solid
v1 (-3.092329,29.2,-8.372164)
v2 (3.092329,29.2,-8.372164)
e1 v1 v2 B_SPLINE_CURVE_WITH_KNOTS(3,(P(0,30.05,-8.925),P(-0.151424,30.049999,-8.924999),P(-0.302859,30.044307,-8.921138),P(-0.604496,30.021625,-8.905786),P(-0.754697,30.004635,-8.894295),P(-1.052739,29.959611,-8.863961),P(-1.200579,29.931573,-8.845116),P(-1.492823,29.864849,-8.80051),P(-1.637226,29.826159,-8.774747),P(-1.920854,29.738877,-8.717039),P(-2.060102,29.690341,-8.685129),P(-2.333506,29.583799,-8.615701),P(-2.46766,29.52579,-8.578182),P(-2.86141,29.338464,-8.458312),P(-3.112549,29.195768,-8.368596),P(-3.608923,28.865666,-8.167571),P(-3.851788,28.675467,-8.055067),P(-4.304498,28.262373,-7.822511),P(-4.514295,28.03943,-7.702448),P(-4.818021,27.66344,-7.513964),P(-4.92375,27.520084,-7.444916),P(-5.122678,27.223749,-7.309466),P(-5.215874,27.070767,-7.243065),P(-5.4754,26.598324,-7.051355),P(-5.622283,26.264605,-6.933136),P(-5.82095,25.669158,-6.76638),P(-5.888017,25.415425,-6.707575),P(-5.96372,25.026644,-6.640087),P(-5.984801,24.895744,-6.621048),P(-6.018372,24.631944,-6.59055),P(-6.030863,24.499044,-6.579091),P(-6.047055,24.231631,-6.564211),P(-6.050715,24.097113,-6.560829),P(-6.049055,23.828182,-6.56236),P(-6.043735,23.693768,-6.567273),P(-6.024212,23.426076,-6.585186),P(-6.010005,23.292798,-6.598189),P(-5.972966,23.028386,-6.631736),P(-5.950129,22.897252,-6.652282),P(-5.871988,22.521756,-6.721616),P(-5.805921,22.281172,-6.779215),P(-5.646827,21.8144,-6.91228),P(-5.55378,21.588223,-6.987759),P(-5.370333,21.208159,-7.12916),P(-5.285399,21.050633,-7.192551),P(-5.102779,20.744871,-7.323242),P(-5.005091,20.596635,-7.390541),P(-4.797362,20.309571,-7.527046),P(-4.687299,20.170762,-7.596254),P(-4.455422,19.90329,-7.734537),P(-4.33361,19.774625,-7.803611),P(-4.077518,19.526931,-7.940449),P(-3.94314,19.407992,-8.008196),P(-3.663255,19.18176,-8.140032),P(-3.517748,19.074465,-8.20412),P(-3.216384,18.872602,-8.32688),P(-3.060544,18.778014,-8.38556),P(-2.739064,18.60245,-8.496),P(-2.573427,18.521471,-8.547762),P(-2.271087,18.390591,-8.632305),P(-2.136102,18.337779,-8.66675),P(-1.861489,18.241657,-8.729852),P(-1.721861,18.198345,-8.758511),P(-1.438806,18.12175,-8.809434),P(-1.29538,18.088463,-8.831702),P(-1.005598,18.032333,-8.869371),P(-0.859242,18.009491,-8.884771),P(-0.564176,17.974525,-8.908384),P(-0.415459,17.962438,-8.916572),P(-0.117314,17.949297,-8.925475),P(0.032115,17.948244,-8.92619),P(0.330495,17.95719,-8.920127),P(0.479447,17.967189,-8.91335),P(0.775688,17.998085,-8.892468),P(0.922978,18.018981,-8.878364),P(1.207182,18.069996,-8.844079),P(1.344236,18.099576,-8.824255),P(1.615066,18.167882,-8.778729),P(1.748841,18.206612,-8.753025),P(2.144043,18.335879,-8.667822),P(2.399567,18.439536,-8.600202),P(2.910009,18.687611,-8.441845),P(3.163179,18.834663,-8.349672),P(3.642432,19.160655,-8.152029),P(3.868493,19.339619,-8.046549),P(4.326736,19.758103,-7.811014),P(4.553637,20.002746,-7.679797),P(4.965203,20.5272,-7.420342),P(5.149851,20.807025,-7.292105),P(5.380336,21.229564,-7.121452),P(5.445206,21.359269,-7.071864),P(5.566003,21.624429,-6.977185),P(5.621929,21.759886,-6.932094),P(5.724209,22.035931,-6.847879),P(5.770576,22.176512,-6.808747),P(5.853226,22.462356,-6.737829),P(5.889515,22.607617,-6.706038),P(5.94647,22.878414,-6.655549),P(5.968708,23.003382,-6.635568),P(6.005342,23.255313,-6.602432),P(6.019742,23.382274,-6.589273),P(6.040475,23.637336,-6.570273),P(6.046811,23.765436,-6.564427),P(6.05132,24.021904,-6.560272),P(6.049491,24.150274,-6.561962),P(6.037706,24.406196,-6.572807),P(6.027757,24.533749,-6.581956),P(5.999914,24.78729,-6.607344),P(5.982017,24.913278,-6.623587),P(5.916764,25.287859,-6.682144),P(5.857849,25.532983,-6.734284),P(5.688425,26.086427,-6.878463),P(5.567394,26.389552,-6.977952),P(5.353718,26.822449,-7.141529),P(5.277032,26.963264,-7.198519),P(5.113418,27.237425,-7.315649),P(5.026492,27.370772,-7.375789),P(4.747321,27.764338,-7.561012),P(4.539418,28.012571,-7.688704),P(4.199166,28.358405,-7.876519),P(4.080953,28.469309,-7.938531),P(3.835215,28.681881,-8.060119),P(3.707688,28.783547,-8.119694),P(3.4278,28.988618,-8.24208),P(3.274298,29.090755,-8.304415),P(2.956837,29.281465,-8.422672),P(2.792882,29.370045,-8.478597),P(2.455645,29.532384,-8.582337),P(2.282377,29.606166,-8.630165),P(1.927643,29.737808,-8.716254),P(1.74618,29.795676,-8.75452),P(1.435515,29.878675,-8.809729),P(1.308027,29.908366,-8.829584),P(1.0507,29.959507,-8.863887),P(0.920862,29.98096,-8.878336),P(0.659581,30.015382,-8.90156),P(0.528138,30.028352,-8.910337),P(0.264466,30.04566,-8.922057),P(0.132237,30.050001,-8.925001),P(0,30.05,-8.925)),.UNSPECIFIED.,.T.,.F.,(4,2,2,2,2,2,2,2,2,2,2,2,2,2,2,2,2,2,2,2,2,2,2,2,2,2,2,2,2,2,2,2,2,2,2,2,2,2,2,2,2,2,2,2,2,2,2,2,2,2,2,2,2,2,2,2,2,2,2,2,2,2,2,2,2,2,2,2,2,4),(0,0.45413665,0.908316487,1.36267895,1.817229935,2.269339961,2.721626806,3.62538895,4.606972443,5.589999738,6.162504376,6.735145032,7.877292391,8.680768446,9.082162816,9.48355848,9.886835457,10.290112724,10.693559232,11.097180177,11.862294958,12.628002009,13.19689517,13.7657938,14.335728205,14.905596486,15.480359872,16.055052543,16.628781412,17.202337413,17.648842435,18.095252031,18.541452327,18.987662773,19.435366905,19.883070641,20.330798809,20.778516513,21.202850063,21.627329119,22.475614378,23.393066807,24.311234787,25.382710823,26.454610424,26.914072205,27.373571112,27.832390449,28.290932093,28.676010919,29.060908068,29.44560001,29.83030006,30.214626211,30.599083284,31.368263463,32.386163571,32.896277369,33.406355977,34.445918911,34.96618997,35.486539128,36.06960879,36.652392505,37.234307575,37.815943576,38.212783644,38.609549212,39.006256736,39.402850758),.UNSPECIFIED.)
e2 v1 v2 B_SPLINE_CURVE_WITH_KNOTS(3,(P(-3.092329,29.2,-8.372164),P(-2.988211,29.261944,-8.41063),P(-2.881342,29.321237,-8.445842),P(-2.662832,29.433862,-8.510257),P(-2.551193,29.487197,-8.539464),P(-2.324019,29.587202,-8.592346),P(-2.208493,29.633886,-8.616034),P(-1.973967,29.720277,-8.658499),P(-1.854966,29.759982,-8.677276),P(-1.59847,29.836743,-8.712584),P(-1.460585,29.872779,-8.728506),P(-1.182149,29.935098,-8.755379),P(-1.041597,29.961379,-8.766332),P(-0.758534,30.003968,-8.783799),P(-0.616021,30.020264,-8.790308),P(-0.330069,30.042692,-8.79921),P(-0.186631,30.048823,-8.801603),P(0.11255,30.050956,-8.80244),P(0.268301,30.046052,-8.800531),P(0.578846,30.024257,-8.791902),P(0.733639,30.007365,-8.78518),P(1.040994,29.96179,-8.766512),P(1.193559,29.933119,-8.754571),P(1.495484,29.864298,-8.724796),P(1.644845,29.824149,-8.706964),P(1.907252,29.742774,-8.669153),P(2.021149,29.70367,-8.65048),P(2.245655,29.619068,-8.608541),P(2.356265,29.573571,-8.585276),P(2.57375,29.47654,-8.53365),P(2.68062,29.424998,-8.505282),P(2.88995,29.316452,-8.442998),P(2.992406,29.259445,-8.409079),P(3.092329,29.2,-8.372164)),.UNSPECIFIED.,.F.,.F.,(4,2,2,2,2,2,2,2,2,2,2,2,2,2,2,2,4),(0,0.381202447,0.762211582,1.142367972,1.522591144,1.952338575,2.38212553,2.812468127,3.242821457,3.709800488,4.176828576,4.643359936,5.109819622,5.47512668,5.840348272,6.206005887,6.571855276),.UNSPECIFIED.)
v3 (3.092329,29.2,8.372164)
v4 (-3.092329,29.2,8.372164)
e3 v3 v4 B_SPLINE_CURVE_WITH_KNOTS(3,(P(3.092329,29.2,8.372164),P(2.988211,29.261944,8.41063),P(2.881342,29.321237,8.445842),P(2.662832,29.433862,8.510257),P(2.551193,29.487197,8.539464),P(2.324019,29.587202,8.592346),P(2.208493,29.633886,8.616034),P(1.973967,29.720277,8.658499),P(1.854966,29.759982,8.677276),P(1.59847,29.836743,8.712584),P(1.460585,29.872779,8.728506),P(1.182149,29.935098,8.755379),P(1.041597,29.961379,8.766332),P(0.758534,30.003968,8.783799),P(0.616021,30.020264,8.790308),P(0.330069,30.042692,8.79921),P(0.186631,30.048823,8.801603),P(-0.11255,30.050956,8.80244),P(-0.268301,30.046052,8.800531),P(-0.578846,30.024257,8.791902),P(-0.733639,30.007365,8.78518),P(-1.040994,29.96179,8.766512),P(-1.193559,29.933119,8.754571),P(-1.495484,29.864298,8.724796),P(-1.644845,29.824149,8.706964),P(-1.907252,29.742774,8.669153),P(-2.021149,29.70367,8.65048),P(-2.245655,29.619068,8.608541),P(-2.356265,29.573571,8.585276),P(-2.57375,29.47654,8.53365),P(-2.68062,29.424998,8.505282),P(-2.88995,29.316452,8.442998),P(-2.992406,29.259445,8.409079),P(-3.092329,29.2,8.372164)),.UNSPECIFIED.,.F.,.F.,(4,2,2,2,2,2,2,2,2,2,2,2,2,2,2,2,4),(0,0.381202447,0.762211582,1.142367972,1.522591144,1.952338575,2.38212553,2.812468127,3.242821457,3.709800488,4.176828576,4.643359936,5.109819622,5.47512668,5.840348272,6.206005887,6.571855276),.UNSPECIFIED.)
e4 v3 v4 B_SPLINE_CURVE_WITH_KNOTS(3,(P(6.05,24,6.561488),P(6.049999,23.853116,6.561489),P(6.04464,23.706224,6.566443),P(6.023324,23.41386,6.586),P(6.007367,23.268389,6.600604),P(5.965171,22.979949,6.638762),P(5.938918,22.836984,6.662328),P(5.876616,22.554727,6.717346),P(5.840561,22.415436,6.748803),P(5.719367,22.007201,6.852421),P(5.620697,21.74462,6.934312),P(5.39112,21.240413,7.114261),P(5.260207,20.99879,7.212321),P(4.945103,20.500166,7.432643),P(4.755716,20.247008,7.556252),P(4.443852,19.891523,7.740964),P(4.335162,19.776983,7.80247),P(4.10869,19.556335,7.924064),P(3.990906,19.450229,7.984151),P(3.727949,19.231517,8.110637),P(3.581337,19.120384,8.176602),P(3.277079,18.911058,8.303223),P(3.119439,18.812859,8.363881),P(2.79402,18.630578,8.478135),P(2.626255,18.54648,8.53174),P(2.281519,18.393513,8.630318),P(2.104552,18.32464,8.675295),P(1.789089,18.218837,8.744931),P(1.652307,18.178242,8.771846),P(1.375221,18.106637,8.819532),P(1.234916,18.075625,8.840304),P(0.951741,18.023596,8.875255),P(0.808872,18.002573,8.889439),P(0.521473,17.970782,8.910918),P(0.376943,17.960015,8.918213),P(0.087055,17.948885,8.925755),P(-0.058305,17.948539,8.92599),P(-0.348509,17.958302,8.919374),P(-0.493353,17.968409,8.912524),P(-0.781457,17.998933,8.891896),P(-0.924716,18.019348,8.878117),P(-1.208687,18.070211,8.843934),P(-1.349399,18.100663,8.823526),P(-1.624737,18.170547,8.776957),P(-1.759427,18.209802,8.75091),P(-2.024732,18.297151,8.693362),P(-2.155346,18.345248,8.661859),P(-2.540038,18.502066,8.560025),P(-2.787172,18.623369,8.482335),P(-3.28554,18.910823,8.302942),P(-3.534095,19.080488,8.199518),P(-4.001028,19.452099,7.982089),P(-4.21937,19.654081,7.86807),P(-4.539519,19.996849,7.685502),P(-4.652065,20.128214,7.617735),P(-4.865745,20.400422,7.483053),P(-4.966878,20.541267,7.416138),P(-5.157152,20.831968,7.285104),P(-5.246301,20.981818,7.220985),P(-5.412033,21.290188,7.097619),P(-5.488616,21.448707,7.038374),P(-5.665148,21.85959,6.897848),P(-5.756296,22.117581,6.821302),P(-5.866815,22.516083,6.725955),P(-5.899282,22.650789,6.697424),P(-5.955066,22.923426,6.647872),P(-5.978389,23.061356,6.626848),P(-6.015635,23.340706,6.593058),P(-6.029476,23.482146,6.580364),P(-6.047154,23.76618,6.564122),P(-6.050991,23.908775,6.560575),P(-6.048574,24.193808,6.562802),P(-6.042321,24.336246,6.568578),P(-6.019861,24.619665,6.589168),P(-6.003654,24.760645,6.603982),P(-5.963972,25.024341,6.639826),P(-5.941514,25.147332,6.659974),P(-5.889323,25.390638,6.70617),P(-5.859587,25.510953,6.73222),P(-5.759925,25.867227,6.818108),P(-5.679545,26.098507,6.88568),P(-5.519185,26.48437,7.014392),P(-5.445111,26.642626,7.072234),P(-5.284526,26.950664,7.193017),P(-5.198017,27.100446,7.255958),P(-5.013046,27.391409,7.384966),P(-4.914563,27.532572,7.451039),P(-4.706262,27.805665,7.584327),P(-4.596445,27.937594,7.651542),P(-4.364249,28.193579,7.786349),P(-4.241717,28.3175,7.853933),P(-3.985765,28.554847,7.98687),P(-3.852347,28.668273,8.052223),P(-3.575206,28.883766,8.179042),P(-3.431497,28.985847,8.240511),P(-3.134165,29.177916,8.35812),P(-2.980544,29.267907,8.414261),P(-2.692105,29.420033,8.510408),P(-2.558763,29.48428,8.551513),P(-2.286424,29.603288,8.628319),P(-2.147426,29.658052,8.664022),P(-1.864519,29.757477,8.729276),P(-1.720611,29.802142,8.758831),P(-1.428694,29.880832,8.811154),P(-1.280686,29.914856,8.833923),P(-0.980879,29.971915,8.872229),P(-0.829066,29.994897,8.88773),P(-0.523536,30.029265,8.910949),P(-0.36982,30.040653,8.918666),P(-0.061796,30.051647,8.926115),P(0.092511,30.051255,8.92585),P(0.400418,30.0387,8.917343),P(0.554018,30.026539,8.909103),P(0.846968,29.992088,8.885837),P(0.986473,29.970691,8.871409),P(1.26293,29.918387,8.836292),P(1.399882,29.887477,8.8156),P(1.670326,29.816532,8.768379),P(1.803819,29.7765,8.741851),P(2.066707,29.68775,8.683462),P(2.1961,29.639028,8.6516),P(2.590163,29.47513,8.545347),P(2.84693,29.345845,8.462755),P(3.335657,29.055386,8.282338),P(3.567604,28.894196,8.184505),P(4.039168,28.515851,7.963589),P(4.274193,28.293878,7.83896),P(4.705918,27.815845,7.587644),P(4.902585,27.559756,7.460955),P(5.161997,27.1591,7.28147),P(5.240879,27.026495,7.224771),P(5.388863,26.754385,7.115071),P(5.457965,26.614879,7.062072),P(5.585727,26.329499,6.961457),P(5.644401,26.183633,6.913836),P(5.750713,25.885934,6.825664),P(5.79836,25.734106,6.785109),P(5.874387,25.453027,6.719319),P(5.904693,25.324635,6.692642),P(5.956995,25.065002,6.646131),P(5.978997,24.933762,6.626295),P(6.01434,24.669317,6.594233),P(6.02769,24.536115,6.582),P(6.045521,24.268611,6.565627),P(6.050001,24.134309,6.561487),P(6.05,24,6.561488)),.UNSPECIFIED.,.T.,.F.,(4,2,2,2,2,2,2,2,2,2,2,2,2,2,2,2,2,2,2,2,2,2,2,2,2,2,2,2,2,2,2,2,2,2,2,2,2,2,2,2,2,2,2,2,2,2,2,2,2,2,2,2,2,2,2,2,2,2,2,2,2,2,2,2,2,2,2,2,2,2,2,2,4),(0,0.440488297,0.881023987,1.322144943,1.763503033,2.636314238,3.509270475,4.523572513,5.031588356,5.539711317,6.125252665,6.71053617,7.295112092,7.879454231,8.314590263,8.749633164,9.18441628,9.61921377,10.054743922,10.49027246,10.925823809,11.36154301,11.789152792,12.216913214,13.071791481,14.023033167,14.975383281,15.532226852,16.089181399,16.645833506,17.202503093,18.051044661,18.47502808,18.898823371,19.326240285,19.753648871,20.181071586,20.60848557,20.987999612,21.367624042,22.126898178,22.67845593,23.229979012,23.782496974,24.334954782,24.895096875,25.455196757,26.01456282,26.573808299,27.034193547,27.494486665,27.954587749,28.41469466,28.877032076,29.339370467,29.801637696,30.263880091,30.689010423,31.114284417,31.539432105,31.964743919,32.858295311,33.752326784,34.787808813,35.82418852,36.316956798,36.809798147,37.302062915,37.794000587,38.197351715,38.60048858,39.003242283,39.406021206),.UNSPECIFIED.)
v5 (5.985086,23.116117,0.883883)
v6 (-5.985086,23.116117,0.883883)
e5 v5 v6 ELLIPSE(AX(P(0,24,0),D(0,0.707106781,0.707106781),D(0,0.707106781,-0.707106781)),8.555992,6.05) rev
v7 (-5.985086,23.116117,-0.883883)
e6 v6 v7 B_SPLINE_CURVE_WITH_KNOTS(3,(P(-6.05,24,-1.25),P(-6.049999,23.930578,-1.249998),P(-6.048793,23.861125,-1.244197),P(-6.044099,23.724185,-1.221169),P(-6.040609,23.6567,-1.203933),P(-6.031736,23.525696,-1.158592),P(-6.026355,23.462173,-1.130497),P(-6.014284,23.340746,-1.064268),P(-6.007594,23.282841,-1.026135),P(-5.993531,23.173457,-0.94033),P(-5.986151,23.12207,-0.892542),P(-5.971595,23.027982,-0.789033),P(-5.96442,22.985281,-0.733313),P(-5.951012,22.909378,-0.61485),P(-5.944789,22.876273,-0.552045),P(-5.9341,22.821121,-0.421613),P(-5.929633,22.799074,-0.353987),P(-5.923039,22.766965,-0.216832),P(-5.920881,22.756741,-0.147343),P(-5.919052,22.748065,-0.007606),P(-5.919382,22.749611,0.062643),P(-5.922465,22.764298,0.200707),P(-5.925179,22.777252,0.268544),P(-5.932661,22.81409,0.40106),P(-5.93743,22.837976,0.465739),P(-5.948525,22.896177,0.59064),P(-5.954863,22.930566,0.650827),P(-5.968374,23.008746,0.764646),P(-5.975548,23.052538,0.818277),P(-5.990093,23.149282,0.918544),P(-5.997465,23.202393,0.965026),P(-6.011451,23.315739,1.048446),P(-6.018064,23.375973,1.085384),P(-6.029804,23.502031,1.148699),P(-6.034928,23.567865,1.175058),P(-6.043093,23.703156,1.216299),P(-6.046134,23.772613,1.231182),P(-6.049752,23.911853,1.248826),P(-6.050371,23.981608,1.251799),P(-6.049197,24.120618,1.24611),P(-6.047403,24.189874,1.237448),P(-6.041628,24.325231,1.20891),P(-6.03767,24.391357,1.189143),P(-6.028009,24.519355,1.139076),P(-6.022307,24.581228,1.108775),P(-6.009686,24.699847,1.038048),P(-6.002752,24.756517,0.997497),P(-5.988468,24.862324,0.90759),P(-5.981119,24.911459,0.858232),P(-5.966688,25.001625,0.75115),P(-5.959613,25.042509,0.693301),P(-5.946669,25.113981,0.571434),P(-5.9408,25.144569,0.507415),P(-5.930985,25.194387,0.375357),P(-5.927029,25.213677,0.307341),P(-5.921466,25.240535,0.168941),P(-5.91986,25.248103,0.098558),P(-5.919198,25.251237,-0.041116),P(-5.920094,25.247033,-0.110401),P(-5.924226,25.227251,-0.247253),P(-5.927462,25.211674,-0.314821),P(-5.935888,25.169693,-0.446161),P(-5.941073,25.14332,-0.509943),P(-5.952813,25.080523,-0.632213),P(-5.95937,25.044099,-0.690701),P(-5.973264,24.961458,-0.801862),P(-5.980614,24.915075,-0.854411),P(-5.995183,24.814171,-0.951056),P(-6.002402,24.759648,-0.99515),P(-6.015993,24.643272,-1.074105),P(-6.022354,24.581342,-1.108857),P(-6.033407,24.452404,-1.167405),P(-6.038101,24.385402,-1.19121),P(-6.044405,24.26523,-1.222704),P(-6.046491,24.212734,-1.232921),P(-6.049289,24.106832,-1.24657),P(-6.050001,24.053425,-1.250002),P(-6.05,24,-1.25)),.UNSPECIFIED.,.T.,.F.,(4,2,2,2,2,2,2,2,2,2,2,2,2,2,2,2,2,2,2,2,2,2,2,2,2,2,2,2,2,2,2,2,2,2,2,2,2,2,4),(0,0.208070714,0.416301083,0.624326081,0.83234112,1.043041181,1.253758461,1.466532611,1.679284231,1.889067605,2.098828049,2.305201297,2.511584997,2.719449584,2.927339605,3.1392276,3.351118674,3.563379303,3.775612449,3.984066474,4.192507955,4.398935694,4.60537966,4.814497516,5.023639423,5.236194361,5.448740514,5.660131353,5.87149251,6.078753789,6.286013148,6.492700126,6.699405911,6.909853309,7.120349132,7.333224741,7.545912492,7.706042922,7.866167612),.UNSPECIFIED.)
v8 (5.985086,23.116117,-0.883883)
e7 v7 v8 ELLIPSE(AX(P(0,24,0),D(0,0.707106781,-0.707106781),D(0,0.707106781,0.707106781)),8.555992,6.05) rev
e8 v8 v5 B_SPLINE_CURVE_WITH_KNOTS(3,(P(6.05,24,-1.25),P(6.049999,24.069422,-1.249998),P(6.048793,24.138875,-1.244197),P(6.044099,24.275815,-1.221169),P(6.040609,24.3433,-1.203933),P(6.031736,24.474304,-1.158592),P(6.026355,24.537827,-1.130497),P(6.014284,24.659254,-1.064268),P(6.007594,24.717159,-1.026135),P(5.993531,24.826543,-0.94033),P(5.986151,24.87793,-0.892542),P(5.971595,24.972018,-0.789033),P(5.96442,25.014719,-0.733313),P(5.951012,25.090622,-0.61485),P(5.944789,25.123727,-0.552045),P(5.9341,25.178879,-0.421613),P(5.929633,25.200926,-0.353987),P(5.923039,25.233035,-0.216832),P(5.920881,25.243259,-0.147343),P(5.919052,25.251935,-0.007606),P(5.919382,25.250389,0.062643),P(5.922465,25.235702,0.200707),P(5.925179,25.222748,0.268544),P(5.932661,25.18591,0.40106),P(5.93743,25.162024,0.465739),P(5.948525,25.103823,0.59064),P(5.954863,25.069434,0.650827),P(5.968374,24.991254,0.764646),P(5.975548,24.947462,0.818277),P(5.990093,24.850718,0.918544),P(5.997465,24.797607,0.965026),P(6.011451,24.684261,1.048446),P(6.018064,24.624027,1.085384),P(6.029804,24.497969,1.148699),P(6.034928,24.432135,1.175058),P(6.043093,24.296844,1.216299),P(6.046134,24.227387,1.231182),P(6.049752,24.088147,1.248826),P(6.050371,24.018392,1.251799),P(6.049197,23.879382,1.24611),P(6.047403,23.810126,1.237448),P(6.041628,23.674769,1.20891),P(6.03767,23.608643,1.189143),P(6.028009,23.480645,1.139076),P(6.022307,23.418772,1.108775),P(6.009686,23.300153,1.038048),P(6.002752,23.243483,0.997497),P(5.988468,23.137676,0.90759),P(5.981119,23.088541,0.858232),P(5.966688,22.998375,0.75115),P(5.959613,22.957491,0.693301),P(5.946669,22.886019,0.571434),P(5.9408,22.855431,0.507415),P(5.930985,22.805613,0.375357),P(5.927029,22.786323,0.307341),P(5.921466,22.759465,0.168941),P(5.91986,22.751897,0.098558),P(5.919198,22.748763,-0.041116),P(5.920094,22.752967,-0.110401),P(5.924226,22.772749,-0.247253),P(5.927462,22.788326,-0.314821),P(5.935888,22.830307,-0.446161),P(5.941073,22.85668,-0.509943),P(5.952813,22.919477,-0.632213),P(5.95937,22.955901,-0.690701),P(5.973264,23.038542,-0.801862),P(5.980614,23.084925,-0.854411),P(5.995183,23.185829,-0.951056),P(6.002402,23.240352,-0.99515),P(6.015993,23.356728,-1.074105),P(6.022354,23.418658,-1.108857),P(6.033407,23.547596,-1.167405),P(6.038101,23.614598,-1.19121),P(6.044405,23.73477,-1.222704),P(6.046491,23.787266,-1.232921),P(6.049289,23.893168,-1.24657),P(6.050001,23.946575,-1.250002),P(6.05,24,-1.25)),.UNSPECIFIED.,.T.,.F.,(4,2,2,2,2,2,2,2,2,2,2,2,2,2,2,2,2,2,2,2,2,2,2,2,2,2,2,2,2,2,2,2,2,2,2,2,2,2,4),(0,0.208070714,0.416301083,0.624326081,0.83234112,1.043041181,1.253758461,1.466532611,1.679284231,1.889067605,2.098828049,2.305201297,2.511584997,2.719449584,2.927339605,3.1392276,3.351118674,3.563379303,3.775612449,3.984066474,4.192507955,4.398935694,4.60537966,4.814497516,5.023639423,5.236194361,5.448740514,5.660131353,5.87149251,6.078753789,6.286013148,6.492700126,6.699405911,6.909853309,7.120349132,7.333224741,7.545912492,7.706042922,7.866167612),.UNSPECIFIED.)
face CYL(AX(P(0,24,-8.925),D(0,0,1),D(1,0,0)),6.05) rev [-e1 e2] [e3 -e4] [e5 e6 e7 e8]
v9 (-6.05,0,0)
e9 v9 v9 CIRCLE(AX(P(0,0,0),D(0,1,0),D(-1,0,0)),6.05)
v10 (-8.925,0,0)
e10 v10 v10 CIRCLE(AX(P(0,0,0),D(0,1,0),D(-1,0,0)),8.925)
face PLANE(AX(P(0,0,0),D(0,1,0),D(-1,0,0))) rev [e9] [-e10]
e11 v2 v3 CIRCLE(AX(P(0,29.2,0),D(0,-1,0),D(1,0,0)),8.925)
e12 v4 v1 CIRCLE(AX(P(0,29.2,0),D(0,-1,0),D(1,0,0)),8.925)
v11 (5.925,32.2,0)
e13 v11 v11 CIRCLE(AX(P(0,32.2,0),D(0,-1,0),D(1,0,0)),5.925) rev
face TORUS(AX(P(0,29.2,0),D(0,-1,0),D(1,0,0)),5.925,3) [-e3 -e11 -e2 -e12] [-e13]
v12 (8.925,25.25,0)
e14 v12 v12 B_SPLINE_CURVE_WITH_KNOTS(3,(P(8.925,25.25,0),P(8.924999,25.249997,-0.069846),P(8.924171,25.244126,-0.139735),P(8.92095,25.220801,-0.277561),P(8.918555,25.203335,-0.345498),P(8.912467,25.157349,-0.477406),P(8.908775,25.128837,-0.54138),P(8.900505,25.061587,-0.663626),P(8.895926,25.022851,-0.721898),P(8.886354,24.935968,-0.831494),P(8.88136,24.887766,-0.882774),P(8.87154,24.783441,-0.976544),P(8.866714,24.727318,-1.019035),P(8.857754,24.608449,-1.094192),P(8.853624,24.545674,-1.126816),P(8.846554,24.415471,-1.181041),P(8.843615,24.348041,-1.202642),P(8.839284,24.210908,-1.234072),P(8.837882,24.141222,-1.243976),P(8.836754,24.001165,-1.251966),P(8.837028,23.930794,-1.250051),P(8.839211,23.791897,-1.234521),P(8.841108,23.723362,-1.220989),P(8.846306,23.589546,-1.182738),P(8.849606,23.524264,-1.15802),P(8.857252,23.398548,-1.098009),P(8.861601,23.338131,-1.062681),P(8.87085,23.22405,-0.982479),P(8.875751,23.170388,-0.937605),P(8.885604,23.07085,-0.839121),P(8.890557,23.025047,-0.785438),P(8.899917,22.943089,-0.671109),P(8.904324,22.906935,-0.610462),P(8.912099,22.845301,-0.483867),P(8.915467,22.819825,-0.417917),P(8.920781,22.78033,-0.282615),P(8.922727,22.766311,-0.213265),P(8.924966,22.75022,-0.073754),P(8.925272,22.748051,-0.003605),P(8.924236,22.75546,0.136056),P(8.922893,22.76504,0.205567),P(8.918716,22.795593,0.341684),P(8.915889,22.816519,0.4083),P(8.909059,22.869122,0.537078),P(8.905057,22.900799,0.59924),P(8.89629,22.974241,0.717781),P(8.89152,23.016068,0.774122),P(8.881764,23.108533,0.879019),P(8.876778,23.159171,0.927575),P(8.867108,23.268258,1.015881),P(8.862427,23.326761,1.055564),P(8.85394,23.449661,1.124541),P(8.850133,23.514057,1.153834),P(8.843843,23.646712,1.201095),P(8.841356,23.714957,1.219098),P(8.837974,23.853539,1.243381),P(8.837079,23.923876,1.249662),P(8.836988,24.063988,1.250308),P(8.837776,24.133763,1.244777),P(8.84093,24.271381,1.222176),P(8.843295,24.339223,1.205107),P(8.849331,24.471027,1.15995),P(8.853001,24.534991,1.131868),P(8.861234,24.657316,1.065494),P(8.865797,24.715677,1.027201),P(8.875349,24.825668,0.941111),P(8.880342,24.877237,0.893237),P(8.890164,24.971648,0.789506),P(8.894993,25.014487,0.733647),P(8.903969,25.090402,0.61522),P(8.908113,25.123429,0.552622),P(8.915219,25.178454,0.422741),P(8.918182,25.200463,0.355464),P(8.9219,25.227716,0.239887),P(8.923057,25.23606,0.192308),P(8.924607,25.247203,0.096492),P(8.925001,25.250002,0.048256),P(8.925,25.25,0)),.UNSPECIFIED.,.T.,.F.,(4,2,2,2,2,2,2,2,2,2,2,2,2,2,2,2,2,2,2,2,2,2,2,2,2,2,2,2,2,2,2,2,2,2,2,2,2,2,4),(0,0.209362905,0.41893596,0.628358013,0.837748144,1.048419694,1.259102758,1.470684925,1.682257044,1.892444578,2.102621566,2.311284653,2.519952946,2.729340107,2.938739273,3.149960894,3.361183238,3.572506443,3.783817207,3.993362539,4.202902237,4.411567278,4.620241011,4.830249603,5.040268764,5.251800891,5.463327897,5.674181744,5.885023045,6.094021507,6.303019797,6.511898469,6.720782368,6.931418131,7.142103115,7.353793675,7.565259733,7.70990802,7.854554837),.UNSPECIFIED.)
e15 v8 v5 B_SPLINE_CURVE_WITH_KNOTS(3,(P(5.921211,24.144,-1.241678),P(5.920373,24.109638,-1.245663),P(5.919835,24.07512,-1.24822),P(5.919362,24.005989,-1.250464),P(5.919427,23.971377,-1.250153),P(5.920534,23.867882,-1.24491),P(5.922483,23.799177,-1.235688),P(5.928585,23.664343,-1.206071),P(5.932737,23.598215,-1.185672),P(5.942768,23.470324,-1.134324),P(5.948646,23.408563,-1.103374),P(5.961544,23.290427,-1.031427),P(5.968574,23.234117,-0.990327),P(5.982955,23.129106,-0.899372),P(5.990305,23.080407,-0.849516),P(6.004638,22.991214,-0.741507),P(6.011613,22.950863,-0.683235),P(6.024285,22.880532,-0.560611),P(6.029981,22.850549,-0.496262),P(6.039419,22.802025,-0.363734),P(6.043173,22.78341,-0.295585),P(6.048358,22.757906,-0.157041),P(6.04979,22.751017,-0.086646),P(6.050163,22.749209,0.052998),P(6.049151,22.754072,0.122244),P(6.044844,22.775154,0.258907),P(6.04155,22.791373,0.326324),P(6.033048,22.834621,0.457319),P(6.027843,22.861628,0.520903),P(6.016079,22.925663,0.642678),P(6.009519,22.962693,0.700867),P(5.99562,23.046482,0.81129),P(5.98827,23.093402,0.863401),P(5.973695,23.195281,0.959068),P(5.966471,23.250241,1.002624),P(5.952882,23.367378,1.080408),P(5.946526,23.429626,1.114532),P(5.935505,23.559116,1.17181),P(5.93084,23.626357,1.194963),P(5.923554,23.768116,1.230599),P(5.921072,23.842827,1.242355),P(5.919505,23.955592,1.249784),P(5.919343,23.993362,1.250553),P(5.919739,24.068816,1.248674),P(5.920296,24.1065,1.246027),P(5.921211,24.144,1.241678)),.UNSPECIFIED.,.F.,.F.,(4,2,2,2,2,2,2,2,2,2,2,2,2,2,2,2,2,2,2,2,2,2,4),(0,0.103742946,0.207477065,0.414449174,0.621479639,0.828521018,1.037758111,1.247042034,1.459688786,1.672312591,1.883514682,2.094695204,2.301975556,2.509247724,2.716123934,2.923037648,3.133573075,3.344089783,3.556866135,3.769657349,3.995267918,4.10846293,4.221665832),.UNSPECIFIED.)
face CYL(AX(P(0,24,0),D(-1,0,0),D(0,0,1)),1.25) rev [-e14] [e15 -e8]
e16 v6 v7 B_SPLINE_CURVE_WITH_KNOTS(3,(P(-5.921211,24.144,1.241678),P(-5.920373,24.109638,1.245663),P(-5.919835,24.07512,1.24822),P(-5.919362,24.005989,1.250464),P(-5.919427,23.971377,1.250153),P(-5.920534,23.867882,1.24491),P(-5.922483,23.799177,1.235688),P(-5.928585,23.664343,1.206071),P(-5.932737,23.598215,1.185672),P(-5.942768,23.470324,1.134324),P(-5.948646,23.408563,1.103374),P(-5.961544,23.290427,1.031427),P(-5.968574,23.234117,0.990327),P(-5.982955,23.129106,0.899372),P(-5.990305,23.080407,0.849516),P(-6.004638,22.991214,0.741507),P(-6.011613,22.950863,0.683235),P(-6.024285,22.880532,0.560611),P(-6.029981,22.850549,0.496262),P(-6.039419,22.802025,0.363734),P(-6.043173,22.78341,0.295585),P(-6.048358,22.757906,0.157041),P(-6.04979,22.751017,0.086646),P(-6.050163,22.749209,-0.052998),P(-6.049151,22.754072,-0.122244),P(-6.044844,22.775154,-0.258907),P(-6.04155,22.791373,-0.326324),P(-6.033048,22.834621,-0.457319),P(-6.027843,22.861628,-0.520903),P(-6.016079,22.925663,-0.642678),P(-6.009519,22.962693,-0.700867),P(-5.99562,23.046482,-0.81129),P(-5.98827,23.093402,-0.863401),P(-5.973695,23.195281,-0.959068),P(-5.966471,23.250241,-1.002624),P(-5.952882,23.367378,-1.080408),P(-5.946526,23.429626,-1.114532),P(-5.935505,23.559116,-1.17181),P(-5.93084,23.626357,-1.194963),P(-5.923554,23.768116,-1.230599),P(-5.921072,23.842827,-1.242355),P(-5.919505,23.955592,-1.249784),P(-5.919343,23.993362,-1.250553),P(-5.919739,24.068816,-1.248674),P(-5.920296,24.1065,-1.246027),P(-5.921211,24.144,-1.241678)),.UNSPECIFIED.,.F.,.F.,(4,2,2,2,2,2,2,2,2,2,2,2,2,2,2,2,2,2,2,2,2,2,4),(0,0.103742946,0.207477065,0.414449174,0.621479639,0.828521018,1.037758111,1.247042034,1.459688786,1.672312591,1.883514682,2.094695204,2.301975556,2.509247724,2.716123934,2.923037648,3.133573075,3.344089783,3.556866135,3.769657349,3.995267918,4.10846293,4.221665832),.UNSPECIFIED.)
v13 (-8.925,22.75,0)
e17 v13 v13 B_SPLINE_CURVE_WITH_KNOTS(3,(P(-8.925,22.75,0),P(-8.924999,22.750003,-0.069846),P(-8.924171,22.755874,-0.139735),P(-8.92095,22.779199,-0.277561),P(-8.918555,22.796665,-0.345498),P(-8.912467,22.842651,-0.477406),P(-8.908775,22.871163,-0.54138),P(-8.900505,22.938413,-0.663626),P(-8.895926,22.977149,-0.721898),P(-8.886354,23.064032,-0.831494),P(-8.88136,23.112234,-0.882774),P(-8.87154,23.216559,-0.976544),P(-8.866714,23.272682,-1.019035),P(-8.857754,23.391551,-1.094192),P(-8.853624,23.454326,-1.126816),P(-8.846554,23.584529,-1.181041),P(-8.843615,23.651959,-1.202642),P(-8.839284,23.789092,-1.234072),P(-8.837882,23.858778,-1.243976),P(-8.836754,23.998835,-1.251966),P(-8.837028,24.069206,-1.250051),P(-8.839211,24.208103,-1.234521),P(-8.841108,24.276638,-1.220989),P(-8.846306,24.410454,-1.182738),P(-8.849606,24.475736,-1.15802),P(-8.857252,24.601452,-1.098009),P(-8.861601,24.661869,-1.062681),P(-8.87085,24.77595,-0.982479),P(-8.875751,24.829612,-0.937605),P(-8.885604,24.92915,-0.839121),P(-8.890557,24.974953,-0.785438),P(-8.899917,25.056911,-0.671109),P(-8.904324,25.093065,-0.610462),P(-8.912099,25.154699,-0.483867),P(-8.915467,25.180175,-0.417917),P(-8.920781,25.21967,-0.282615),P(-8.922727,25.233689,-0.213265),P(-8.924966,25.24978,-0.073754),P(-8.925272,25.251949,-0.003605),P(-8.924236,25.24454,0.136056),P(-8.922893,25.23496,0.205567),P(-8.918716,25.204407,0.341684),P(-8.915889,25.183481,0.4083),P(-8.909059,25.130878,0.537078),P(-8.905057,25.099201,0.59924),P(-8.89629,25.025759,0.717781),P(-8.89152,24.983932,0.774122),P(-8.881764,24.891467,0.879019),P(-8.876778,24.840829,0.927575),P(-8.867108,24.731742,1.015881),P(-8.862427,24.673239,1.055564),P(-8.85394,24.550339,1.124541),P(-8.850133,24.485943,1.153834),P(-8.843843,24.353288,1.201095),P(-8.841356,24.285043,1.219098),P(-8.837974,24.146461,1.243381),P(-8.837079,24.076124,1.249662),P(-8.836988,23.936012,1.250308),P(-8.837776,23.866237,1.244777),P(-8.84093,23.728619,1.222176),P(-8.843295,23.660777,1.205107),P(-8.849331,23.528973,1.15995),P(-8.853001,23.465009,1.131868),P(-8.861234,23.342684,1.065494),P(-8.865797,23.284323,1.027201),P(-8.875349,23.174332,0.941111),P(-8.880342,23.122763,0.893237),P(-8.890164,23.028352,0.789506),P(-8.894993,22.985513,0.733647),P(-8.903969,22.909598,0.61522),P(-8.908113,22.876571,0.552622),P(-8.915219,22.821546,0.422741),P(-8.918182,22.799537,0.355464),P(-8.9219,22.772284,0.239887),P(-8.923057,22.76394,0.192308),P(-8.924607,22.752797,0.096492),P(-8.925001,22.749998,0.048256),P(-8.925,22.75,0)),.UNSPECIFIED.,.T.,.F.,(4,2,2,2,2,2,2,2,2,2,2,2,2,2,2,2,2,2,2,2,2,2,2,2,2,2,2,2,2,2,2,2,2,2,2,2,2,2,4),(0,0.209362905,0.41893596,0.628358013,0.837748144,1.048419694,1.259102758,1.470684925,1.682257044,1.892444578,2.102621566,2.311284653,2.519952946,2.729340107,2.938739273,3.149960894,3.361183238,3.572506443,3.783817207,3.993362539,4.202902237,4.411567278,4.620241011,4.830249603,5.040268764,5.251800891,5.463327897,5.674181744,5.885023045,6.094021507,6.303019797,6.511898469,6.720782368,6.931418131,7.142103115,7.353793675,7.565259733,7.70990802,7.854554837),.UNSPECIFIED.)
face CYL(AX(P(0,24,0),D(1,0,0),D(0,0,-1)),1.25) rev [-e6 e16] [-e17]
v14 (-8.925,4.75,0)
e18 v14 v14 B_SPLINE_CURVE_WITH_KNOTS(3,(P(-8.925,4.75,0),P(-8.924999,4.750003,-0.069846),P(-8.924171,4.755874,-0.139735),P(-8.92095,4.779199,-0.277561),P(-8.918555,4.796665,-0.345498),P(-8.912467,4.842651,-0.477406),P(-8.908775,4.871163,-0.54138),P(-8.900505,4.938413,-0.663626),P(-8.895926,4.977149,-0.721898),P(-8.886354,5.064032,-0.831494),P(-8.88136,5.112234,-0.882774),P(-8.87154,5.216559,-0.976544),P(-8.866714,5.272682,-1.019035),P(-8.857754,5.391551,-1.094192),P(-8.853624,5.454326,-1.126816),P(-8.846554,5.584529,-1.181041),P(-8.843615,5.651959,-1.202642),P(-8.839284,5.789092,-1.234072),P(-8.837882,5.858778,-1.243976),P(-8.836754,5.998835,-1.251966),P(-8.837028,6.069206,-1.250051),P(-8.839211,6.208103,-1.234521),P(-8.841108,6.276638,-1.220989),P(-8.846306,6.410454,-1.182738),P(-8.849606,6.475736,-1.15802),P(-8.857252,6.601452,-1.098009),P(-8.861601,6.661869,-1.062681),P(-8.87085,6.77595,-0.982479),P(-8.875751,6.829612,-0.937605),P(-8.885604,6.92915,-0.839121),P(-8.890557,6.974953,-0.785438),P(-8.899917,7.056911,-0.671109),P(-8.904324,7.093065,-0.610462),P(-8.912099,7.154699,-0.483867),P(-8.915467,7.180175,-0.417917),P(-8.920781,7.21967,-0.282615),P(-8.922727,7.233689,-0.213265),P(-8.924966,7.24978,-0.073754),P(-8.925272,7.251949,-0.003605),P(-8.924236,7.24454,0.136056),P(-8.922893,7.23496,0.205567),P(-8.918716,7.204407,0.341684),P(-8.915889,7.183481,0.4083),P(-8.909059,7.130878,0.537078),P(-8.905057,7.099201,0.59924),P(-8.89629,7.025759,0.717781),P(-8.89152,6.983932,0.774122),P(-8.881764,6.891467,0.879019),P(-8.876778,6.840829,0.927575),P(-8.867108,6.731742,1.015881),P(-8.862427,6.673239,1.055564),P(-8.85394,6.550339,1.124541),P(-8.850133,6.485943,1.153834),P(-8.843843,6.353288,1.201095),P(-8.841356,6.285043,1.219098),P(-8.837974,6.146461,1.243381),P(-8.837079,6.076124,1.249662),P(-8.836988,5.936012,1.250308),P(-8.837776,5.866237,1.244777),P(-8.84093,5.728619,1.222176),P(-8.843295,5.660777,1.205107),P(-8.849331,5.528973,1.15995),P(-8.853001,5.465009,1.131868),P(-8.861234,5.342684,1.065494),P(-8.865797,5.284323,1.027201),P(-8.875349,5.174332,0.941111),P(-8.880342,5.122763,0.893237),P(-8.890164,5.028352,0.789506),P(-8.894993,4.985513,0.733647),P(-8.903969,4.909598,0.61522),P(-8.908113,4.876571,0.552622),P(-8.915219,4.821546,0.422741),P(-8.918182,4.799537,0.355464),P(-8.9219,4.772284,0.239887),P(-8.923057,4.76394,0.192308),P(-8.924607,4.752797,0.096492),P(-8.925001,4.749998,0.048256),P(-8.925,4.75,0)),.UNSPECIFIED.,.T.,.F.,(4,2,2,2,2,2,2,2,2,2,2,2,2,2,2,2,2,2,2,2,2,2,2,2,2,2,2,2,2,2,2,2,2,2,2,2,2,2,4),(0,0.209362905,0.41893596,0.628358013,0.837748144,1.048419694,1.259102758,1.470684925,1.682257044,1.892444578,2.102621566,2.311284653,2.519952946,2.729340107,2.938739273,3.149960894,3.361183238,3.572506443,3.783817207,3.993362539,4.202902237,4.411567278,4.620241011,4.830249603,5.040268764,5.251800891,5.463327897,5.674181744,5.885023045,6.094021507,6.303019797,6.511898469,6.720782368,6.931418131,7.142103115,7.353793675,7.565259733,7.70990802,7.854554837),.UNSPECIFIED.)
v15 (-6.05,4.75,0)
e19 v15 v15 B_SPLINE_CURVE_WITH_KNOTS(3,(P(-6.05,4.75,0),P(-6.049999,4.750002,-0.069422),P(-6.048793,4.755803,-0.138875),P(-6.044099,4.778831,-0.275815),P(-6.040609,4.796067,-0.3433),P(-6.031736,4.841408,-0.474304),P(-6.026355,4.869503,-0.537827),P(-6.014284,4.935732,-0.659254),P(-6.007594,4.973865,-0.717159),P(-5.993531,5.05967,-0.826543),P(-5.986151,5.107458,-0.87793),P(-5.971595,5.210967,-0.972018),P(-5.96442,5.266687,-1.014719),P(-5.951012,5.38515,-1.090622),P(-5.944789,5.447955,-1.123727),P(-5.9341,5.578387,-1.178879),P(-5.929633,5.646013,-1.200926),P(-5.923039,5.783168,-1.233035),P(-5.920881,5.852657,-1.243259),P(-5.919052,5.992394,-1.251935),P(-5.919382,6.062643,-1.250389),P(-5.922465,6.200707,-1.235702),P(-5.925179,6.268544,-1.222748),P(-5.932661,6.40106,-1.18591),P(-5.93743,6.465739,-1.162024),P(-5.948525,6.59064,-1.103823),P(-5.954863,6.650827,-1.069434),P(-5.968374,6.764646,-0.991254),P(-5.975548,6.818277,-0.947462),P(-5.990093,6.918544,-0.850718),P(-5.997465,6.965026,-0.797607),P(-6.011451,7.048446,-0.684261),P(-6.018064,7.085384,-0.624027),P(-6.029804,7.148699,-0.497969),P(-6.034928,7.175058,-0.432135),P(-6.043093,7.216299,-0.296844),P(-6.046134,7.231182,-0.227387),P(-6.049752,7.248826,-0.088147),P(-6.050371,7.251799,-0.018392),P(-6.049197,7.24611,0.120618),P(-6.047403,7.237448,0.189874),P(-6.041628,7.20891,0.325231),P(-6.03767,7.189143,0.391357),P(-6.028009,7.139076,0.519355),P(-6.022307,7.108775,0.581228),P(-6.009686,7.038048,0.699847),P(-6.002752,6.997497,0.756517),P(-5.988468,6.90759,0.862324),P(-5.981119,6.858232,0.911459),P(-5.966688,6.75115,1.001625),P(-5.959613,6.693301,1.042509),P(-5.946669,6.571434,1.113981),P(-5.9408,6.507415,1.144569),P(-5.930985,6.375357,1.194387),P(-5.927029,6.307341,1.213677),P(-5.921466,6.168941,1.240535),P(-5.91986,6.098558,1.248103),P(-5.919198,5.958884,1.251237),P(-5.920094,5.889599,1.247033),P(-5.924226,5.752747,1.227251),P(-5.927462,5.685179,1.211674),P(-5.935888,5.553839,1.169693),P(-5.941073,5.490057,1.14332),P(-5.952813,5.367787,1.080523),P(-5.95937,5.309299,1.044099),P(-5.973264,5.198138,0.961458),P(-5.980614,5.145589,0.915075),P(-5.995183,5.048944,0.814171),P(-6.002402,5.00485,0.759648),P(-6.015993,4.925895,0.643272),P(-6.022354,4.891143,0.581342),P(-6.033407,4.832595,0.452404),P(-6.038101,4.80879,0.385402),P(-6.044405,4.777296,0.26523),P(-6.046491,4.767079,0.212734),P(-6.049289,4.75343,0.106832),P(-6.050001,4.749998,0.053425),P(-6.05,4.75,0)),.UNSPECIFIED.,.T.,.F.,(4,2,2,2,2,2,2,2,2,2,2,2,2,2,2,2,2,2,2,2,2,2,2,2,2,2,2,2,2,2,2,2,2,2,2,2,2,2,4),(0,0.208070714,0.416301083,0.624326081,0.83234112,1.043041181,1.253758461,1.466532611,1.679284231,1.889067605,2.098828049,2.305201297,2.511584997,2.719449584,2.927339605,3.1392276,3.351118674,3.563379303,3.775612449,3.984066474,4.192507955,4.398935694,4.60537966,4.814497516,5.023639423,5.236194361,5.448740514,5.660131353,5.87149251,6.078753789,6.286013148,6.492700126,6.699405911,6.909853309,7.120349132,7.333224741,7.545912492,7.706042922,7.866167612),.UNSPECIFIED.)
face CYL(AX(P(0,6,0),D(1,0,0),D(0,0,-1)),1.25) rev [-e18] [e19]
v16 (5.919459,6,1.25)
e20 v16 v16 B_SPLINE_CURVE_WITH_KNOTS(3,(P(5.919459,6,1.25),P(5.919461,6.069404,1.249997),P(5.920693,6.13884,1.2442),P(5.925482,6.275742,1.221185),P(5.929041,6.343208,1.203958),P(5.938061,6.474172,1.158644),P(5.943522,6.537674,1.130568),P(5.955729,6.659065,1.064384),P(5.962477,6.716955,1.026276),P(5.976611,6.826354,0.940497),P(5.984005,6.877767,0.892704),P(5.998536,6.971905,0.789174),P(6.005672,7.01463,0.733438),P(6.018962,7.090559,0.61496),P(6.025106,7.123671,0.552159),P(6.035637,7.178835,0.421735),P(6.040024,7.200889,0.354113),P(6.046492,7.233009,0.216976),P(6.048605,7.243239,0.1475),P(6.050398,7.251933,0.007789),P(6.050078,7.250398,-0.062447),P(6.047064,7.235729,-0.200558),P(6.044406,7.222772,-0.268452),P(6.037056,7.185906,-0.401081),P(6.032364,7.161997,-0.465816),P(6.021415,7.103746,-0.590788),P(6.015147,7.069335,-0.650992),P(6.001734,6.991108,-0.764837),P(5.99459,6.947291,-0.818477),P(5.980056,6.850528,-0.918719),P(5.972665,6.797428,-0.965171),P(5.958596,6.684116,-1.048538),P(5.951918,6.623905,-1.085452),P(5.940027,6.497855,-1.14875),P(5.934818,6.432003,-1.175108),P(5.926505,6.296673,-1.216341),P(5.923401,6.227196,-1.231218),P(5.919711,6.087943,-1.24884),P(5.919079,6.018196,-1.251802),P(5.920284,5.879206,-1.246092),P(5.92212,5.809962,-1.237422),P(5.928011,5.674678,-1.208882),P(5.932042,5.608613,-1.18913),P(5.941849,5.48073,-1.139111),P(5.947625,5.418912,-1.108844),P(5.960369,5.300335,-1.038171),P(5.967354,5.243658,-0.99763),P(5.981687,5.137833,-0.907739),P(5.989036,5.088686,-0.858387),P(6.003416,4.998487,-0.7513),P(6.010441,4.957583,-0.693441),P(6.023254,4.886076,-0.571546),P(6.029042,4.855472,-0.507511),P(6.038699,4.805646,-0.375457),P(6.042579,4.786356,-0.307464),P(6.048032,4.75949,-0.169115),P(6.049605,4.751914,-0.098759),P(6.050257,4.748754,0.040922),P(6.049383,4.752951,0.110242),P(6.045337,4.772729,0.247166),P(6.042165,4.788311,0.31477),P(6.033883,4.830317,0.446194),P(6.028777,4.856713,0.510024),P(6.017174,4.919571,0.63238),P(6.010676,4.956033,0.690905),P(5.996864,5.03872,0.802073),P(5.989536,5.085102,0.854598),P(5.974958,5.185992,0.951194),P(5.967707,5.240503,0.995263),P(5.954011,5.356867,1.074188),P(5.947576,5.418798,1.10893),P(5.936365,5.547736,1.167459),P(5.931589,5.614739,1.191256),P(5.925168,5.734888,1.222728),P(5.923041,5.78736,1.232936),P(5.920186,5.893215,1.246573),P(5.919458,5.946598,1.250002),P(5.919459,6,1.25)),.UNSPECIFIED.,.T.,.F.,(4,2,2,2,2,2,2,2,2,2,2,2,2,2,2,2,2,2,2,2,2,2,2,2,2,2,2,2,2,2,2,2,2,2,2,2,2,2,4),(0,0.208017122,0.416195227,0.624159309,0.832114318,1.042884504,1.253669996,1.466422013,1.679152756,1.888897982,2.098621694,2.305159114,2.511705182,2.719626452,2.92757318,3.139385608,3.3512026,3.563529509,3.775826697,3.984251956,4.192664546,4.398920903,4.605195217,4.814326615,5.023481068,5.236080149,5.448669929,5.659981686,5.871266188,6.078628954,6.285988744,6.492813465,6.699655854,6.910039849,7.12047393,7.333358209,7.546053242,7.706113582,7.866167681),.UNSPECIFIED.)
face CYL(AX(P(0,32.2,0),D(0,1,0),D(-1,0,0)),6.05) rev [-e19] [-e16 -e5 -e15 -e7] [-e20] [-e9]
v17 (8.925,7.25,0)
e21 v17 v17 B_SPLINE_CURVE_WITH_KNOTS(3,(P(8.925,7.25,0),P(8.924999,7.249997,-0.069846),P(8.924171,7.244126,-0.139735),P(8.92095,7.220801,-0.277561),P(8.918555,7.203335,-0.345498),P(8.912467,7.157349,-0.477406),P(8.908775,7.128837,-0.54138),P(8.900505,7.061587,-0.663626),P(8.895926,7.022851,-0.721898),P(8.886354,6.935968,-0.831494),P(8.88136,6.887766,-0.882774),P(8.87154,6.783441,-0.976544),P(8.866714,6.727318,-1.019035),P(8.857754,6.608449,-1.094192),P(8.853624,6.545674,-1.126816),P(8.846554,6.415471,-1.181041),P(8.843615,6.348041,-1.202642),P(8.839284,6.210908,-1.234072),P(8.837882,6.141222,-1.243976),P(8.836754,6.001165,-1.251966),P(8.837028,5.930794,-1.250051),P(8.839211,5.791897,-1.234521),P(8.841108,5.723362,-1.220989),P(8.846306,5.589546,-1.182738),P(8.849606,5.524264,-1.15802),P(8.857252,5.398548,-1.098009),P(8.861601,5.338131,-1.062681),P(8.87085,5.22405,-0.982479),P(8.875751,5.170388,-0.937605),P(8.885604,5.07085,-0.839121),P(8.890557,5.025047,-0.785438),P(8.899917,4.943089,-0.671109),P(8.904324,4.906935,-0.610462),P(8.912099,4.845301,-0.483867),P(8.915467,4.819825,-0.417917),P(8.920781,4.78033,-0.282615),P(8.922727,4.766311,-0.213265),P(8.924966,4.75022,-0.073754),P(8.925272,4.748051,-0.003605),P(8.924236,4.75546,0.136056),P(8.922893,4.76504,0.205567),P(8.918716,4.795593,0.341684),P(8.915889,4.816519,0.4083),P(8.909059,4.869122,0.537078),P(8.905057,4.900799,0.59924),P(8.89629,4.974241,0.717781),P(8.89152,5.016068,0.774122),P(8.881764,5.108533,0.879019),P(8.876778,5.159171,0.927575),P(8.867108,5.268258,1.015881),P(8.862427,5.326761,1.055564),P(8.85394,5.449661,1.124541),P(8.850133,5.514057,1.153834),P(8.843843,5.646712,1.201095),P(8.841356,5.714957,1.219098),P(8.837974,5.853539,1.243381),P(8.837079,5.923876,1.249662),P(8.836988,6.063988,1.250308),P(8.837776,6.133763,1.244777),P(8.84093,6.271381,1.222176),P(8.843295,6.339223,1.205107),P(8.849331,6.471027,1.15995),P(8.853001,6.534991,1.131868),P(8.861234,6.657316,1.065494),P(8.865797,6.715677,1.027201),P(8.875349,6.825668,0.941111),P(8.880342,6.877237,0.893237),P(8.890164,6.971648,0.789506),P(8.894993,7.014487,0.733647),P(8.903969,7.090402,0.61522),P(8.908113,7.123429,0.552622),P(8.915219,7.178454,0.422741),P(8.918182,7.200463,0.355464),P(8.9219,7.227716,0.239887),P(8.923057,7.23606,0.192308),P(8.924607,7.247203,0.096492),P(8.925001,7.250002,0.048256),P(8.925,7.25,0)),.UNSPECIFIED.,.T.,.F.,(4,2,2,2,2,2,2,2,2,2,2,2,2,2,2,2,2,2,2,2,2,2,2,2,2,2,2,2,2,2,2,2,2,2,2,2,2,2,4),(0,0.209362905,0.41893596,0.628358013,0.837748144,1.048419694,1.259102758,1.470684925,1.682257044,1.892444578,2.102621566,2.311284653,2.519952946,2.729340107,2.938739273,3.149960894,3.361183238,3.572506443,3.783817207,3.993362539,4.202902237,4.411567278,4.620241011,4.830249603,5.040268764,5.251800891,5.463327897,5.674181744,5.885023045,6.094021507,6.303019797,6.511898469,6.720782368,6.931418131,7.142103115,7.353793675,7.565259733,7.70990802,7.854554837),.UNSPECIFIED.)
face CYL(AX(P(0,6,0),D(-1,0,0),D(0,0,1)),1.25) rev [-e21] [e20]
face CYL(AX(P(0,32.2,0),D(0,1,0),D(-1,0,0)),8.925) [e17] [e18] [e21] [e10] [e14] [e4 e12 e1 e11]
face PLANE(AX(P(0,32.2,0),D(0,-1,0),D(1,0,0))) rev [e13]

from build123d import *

# Parameters (mm, degrees)
CUT_EXTRUDE_1_DEPTH         = 35.585419616
CUT_EXTRUDE_1_DEPTH_BACK    = 35.585419616
SKETCH_2_R                  = 6.05
SKETCH_4_W                  = 1.25
SKETCH_4_H                  = 8.925
HOLE_WIZARD_M3_1_AT_2_COUNT = 2
HOLE_WIZARD_M3_1_AT_2_PITCH = 18
MIRROR_1_COPY_1_SKETCH_W    = 1.25
MIRROR_1_COPY_1_SKETCH_H    = 8.925
FILLET_1_R                  = 3


with BuildPart() as part:
    # 草图1 → 旋转1 (revolve)
    with BuildSketch(Plane.XY, mode=Mode.PRIVATE) as revolve_1_sk:
        with BuildLine():
            Line((6.05, 0), (8.925, 0))
            Line((8.925, 0), (8.925, 32.2))
            Line((8.925, 32.2), (0, 32.2))
            Line((0, 32.2), (0, 30.05))
            ThreePointArc((0, 30.05), (4.277996026, 28.277996026), (6.05, 24))
            Line((6.05, 24), (6.05, 0))
        make_face()
    revolve(revolve_1_sk.sketch.rotate(Axis((0, 32.2, 0), (0, -1, 0)), 180), axis=Axis((0, 32.2, 0), (0, -1, 0)))

    # 草图2 → 切除-拉伸1 (cut, two sides: drawn at the far end of the back side and taken through both)
    with BuildSketch(Plane.XY.offset(-CUT_EXTRUDE_1_DEPTH_BACK)):
        with Locations((0, 24)):
            Circle(SKETCH_2_R)
    extrude(amount=CUT_EXTRUDE_1_DEPTH + CUT_EXTRUDE_1_DEPTH_BACK, mode=Mode.SUBTRACT)

    # 草图4 → M3 螺纹孔1 (revolve, cut)
    with BuildSketch(Plane.ZX.offset(6)):
        with Locations((0.625, 4.4625)):
            Rectangle(SKETCH_4_W, SKETCH_4_H)
    hole_wizard_m3_1 = revolve(axis=Axis((-6.35, 6, 0), (1, 0, 0)), mode=Mode.SUBTRACT)

    # M3 螺纹孔1 at 2: M3 螺纹孔1 ×2
    with Locations(*[(0, i * HOLE_WIZARD_M3_1_AT_2_PITCH, 0) for i in range(1, HOLE_WIZARD_M3_1_AT_2_COUNT)]):
        add(hole_wizard_m3_1, mode=Mode.SUBTRACT)

    # 镜向1: M3 螺纹孔1 across plane
    add(hole_wizard_m3_1.mirror(Plane(origin=(0, 0, 0), x_dir=(0, 0, 1), z_dir=(1, 0, 0))), mode=Mode.SUBTRACT)

    # 镜向1 copy 1 sketch → 镜向1 copy 1 (revolve, cut)
    with BuildSketch(Plane.ZX.offset(24)):
        with Locations((0.625, -4.4625)):
            Rectangle(MIRROR_1_COPY_1_SKETCH_W, MIRROR_1_COPY_1_SKETCH_H)
    revolve(axis=Axis((6.35, 24, 0), (1, 0, 0)), mode=Mode.SUBTRACT)

    # 圆角1
    # the kernel refuses this fillet: 3 mm, written as the material it takes off along each edge
    with BuildSketch(Plane(origin=(0, 32.2, 0), x_dir=(-1, 0, 0), z_dir=(0, 0, 1))) as fillet_1_piece_1:
        with BuildLine():
            CenterArc((8.925 - FILLET_1_R, FILLET_1_R), FILLET_1_R, 270, 90)
            Line((8.925 - FILLET_1_R, 0), (8.925, 0))
            Line((8.925, 0), (8.925, FILLET_1_R))
        make_face()
    revolve(axis=Axis((0, 32.2, 0), (0, -1, 0)), mode=Mode.SUBTRACT)


solid = part.part
